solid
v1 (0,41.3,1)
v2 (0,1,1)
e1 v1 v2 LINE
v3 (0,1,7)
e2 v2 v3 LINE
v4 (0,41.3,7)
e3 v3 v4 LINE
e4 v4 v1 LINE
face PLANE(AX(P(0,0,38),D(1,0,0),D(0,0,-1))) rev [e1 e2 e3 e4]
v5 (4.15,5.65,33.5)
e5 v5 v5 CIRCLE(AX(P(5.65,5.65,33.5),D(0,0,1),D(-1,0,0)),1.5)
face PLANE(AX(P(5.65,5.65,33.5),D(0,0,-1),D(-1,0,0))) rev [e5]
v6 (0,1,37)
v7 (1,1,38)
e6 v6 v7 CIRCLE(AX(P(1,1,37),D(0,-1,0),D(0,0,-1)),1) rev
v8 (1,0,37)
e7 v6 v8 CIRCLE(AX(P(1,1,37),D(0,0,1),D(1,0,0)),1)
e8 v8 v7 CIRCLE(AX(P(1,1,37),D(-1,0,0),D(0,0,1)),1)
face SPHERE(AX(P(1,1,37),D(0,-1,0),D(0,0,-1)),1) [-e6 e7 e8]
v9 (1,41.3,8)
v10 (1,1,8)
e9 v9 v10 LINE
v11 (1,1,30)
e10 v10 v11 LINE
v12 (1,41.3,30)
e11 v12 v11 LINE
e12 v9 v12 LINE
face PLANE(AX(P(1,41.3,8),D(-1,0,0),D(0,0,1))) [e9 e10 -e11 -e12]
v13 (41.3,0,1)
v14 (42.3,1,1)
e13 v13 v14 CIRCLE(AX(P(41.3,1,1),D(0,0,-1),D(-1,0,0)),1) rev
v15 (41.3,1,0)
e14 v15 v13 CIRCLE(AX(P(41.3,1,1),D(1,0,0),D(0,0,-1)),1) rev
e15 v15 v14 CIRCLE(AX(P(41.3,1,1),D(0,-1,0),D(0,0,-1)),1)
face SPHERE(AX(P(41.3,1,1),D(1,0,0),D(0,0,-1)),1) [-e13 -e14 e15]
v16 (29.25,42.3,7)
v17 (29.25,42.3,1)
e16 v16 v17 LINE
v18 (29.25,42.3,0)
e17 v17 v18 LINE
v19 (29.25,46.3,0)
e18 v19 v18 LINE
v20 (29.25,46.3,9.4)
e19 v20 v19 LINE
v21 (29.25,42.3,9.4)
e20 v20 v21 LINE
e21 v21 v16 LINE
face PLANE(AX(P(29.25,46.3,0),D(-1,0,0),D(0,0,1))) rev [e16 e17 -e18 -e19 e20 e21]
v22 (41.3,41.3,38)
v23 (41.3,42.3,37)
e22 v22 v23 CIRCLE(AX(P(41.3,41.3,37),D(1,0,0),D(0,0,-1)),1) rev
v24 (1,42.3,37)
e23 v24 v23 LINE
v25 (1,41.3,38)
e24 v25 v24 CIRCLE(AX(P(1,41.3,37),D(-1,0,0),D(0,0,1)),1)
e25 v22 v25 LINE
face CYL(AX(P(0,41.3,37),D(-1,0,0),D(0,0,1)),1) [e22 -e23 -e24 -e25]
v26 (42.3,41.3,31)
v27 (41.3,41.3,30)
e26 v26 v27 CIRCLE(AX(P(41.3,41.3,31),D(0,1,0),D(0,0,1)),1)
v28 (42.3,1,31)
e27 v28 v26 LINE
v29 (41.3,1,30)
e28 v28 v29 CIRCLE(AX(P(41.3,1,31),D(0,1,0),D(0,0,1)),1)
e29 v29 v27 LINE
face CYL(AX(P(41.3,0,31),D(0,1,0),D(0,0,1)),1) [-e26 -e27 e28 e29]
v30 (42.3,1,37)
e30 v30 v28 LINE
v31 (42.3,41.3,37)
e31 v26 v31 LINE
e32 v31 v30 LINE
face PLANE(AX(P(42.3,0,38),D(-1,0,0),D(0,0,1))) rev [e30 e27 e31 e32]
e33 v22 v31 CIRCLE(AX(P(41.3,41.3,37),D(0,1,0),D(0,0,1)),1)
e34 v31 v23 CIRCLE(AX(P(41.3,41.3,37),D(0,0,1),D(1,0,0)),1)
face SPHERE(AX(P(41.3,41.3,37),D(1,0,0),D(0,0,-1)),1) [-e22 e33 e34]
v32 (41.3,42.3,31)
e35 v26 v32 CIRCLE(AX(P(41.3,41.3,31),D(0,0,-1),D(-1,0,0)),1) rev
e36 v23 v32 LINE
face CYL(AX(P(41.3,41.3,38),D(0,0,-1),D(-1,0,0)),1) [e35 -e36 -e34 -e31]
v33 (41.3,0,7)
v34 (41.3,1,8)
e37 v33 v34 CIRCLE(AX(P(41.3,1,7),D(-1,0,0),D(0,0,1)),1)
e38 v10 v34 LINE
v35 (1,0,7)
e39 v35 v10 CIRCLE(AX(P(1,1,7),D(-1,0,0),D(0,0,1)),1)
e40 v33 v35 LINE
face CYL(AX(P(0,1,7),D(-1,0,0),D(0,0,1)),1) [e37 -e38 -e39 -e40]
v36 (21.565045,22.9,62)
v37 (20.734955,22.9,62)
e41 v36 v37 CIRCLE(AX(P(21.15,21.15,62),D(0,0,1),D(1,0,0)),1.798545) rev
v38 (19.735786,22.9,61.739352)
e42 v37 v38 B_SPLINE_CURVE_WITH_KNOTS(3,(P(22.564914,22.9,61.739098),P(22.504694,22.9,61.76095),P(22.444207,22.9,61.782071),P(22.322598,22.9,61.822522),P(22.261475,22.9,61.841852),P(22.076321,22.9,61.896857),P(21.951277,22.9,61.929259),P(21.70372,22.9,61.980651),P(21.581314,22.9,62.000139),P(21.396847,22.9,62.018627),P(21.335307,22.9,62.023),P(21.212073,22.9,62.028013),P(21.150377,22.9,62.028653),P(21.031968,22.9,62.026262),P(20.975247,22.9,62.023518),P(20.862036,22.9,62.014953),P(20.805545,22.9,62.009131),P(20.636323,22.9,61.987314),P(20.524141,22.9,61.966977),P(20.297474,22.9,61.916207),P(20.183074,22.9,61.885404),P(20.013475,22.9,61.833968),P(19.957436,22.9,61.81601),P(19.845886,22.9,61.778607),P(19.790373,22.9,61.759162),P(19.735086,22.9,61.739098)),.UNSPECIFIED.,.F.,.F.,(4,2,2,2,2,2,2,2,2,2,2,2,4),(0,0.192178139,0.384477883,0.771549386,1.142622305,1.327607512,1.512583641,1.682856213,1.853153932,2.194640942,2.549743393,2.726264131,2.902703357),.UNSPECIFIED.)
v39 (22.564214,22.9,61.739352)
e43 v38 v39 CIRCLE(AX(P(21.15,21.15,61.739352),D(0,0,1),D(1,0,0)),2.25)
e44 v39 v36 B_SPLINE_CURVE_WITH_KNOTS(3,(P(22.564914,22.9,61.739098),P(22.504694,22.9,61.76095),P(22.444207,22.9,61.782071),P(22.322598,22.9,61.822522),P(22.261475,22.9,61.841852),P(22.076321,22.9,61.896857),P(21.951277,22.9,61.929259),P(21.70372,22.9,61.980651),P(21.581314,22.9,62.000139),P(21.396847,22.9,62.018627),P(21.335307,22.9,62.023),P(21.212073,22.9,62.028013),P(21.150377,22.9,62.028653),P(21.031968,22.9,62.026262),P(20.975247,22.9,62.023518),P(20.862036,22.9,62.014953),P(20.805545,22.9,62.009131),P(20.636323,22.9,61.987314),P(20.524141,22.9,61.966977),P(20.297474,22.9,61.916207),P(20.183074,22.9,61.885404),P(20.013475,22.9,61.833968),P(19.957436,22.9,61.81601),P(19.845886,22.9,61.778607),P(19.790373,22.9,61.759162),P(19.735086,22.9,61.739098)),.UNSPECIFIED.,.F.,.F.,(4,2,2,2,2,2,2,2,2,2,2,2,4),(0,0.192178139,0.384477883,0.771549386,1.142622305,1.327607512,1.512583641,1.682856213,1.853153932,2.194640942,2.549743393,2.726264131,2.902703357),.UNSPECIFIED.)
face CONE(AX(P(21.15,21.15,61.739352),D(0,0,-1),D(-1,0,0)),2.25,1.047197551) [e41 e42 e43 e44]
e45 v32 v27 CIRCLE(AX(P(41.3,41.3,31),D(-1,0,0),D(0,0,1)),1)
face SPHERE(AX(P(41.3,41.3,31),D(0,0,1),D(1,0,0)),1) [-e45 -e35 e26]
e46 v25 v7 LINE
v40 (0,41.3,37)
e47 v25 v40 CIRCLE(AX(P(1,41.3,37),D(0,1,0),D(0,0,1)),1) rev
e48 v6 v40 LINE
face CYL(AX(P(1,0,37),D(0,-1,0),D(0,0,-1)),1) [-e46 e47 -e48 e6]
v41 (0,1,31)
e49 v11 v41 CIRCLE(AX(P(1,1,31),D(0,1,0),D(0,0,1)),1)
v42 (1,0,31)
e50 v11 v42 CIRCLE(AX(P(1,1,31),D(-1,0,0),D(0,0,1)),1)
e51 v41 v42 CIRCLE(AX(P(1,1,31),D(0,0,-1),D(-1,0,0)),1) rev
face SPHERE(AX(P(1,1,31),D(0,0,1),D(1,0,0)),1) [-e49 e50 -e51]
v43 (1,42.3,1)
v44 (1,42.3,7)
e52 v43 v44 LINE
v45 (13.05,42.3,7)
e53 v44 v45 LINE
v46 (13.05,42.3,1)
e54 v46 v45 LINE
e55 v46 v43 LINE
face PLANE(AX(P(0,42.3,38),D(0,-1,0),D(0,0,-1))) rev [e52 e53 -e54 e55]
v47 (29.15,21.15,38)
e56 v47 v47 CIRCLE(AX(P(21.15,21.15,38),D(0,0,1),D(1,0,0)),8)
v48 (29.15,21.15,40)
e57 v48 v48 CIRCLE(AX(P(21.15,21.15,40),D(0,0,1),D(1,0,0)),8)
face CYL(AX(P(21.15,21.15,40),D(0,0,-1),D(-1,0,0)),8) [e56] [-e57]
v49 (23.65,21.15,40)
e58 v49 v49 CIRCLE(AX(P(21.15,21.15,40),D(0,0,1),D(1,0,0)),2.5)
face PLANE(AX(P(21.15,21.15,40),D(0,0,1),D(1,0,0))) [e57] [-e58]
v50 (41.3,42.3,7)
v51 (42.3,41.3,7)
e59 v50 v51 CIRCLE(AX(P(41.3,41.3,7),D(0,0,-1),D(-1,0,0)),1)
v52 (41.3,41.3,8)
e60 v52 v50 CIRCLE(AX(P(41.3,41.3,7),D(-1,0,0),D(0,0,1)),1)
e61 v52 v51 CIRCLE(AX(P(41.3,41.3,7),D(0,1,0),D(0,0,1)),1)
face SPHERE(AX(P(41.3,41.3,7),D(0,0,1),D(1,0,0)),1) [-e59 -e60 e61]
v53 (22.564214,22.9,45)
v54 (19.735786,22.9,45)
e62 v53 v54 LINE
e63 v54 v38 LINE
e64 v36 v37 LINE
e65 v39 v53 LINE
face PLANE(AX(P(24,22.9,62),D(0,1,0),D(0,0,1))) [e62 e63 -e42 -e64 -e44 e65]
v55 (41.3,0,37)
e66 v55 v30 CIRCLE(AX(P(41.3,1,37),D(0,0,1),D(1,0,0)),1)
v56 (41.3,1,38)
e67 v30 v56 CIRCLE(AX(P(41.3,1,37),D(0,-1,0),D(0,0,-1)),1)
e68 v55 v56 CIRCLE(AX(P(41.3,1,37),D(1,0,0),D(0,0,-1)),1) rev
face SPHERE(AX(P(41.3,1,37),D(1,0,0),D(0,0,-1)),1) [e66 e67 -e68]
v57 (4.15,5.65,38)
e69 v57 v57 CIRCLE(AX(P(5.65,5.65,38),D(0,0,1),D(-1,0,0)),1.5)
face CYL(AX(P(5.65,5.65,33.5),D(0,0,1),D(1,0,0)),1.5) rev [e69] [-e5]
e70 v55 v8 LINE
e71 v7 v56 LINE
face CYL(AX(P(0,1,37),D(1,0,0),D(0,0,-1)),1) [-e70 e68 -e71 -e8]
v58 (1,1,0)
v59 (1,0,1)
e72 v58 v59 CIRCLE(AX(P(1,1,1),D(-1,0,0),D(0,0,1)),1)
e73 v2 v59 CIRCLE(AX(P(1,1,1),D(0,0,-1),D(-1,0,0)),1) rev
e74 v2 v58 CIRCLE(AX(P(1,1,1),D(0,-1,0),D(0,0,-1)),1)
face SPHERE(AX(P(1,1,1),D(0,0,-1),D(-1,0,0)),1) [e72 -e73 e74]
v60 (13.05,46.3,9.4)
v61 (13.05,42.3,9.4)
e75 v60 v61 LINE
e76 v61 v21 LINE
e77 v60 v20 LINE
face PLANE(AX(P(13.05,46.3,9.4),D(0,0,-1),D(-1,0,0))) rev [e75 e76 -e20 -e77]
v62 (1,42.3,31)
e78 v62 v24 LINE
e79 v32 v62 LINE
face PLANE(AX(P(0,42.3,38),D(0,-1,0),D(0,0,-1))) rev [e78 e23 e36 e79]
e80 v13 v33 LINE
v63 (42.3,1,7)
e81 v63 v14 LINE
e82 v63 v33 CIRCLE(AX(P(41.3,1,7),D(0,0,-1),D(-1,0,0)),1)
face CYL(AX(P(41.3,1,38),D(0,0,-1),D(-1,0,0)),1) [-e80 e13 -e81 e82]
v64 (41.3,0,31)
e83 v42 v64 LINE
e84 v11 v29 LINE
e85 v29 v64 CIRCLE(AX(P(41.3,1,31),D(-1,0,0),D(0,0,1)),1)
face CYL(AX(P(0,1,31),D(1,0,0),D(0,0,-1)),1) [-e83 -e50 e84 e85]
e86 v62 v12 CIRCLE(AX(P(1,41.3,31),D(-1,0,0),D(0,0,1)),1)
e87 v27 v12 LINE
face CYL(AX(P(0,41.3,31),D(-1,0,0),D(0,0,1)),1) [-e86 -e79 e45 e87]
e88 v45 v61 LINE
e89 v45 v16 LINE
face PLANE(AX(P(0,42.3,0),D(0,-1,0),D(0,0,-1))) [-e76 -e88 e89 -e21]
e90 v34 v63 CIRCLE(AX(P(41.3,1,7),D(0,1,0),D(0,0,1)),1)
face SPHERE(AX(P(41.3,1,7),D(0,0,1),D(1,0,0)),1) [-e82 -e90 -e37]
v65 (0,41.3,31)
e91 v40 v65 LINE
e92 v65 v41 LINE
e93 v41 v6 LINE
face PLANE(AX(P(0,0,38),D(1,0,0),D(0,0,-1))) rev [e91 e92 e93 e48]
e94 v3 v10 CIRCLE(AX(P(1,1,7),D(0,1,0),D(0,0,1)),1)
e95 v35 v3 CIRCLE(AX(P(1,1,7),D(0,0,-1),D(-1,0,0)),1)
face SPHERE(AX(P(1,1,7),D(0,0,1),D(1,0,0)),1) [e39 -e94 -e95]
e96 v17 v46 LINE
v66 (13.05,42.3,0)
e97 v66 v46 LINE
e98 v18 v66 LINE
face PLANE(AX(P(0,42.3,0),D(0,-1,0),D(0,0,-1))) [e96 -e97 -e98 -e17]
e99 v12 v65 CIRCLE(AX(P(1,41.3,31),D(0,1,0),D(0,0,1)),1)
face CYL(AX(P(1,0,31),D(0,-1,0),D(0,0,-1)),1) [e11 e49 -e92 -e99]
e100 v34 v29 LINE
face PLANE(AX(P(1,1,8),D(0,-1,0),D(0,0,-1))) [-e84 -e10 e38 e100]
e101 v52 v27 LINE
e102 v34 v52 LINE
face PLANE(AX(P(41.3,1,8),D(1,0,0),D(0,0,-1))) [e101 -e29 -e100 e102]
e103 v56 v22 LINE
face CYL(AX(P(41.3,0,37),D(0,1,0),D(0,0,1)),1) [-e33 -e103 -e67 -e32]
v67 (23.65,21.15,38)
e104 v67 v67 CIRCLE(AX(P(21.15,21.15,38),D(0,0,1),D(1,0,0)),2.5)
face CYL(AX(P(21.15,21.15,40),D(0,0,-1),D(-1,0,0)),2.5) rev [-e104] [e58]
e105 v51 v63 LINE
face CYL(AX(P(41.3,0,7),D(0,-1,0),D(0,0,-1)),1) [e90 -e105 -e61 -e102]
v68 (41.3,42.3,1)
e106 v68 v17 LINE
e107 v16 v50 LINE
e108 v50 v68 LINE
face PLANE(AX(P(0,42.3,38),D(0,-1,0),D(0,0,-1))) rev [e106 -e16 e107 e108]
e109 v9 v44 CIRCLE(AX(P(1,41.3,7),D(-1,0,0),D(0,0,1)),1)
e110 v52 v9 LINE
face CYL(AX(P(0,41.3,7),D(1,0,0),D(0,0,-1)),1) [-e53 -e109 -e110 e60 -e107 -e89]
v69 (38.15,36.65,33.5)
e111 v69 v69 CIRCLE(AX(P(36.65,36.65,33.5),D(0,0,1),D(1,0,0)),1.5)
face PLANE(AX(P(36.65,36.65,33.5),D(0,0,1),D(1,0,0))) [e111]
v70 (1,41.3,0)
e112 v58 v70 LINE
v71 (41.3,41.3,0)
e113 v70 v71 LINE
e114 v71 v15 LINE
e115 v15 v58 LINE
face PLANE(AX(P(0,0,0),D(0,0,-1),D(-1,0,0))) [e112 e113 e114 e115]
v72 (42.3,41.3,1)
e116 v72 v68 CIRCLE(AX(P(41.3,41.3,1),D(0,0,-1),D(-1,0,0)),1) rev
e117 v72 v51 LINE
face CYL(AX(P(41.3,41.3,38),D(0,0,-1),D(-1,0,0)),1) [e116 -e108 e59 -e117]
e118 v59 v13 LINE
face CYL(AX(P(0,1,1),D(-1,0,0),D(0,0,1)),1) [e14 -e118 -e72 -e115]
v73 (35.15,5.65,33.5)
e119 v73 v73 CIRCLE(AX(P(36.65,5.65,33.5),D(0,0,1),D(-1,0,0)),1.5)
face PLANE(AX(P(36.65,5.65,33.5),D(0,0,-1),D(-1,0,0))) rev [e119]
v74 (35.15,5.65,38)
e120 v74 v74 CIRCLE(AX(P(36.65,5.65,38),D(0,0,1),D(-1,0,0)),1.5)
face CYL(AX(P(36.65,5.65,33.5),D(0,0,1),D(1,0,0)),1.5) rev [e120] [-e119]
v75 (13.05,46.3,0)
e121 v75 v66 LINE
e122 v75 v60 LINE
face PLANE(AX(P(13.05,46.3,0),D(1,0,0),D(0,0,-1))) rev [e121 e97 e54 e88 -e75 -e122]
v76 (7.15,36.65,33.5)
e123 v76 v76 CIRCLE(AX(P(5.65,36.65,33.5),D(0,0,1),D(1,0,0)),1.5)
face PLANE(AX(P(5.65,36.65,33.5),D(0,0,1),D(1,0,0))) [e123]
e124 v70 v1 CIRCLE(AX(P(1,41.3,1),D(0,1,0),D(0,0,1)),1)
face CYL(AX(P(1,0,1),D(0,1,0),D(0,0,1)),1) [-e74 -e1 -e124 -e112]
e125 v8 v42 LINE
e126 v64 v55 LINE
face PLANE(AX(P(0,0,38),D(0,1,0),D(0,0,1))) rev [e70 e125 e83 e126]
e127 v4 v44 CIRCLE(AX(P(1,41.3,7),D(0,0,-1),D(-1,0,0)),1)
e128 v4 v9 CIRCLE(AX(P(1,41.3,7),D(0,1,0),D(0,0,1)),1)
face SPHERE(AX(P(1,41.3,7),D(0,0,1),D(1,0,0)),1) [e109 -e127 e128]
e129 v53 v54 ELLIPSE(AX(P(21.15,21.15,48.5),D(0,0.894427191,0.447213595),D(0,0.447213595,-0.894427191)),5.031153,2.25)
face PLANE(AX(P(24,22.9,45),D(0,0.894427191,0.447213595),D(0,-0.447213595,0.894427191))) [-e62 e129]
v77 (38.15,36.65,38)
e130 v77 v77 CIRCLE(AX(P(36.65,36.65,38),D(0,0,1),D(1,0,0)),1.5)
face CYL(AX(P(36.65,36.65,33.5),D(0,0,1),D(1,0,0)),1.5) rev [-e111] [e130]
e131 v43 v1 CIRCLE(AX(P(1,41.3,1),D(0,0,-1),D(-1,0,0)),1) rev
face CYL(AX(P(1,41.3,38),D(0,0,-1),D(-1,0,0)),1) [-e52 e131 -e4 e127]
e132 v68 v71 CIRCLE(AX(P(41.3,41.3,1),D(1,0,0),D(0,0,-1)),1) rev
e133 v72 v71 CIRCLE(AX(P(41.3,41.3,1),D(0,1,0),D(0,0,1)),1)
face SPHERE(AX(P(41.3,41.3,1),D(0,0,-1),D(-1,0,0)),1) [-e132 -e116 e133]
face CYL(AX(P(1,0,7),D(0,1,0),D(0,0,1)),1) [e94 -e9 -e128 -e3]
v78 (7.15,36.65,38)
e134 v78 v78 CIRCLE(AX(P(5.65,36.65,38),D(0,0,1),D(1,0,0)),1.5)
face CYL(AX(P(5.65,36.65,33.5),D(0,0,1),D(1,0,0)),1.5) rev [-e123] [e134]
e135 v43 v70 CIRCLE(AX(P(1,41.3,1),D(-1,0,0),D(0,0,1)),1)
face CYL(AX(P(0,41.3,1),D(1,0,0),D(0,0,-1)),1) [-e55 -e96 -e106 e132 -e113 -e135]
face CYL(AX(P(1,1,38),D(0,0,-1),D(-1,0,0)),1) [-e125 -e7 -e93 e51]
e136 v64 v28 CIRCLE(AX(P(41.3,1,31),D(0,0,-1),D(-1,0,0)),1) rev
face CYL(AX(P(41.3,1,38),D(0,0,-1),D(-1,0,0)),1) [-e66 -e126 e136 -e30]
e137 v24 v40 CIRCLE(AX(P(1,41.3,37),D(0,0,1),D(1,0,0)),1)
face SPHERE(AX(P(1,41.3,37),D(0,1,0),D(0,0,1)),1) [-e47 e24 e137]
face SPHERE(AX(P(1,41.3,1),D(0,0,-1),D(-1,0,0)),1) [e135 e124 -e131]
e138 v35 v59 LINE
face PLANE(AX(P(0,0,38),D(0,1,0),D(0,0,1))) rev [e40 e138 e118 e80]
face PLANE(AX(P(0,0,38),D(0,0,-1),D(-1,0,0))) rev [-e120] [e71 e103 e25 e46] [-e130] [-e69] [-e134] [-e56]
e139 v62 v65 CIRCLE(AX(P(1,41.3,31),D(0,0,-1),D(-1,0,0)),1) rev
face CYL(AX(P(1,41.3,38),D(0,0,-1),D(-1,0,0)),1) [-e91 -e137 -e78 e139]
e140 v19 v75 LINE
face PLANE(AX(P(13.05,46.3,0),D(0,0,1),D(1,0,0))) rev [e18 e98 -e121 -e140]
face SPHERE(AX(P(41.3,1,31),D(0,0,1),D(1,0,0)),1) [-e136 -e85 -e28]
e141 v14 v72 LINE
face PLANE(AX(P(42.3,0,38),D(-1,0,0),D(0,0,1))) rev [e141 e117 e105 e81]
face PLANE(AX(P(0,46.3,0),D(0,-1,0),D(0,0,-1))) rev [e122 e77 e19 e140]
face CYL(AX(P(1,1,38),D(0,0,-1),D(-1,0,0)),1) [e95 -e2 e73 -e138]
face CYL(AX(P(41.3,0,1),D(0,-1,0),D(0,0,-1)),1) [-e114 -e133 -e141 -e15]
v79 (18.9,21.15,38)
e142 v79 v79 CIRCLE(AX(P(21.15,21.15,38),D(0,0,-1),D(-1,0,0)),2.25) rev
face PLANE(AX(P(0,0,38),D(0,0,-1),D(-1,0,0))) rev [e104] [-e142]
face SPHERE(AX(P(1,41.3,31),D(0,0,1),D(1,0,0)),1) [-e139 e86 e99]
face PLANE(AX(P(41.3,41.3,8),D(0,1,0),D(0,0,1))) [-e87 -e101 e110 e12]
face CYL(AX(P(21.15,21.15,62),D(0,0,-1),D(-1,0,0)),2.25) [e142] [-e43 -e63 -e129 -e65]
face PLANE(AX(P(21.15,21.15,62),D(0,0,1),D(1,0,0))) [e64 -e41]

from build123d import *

# Parameters (mm, degrees)
SKETCH_1_W          = 42.3
SKETCH_1_H          = 42.3
EXTRUDE_1_DEPTH     = 38
SKETCH_3_R          = 1.5
CUT_EXTRUDE_1_DEPTH = 4.5
SKETCH_4_R          = 8
SKETCH_4_R_2        = 2.5
EXTRUDE_2_DEPTH     = 2
SKETCH_5_R          = 2.25
EXTRUDE_3_DEPTH     = 24
CUT_EXTRUDE_2_DEPTH = 24
FILLET_1_R          = 1
CUT_EXTRUDE_START   = -8
SKETCH_10_W         = 42.3
SKETCH_10_H         = 42.3
SKETCH_10_W_2       = 40.3
SKETCH_10_H_2       = 40.3
CUT_EXTRUDE_4_DEPTH = 22
FILLET_2_R          = 1
SKETCH_11_W         = 16.2
SKETCH_11_H         = 9.4
EXTRUDE_4_DEPTH     = 4


with BuildPart() as part:
    # 草图1 → 凸台-拉伸1 (new body)
    with BuildSketch(Plane.XY):
        with Locations((21.15, 21.15)):
            Rectangle(SKETCH_1_W, SKETCH_1_H)
    extrude(amount=EXTRUDE_1_DEPTH)

    # 草图3 → 切除-拉伸1 (cut)
    with BuildSketch(Plane.XY.offset(38)):
        with Locations((5.65, 36.65)):
            Circle(SKETCH_3_R)
        with Locations((36.65, 36.65)):
            Circle(SKETCH_3_R)
        with Locations(Location((36.65, 5.65, 0), (0, 0, 180))):
            Circle(SKETCH_3_R)
        with Locations(Location((5.65, 5.65, 0), (0, 0, 180))):
            Circle(SKETCH_3_R)
    extrude(amount=-CUT_EXTRUDE_1_DEPTH, mode=Mode.SUBTRACT)

    # 草图4 → 凸台-拉伸2 (add)
    with BuildSketch(Plane.XY.offset(38)):
        with Locations((21.15, 21.15)):
            Circle(SKETCH_4_R)
        with Locations((21.15, 21.15)):
            Circle(SKETCH_4_R_2, mode=Mode.SUBTRACT)
    extrude(amount=EXTRUDE_2_DEPTH)

    # 草图5 → 凸台-拉伸3 (add)
    with BuildSketch(Plane.XY.offset(38)):
        with Locations(Location((21.15, 21.15, 0), (0, 0, 180))):
            Circle(SKETCH_5_R)
    extrude(amount=EXTRUDE_3_DEPTH)

    # 草图6 → 切除-拉伸2 (cut)
    with BuildSketch(Plane(origin=(0, 0, 0), x_dir=(0, 0, -1), z_dir=(1, 0, 0))):
        Polygon((-62, 22.9), (-45, 22.9), (-44, 23.4), (-62, 23.4), align=None)
    extrude(amount=CUT_EXTRUDE_2_DEPTH, mode=Mode.SUBTRACT)

    # 草图9 → 切除-旋转1 (revolve, cut)
    with BuildSketch(Plane(origin=(0, 21.15, 0), x_dir=(1, 0, 0), z_dir=(0, 1, 0)), mode=Mode.PRIVATE) as cut_revolve_1_sk:
        Polygon((23.4, -61.739352103), (22.6, -62.201232319), (23.4, -62.201232319), align=None)
    revolve(cut_revolve_1_sk.sketch.rotate(Axis((21.15, 21.15, 62), (0, 0, -1)), 180), axis=Axis((21.15, 21.15, 62), (0, 0, -1)), mode=Mode.SUBTRACT)

    # 圆角1
    fillet_1_edges = [part.edges().sort_by_distance(p)[0] for p in [
        (42.3, 21.15, 38),
        (21.15, 42.3, 38),
        (0, 21.15, 38),
        (21.15, 42.3, 0),
        (42.3, 21.15, 0),
        (21.15, 0, 0),
        (0, 21.15, 0),
        (0, 42.3, 19),
        (42.3, 42.3, 19),
        (42.3, 0, 19),
        (0, 0, 19),
        (21.15, 0, 38),
    ]]
    fillet(fillet_1_edges, radius=FILLET_1_R)

    # 草图10 → 切除-拉伸4 (cut)
    with BuildSketch(Plane.XY.offset(38).offset(CUT_EXTRUDE_START)):
        with Locations((21.15, 21.15)):
            Rectangle(SKETCH_10_W, SKETCH_10_H)
        with Locations((21.15, 21.15)):
            Rectangle(SKETCH_10_W_2, SKETCH_10_H_2, mode=Mode.SUBTRACT)
    extrude(amount=-CUT_EXTRUDE_4_DEPTH, mode=Mode.SUBTRACT)

    # 圆角2
    fillet_2_edges = [part.edges().sort_by_distance(p)[0] for p in [
        (0.292893219, 0.292893219, 30),
        (0.292893219, 0.292893219, 8),
        (42.3, 21.15, 8),
        (21.15, 42.3, 8),
        (0, 21.15, 8),
        (21.15, 0, 8),
        (42.007106781, 42.007106781, 30),
        (42.007106781, 0.292893219, 30),
        (0.292893219, 42.007106781, 30),
        (42.007106781, 42.007106781, 8),
        (42.007106781, 0.292893219, 8),
        (0.292893219, 42.007106781, 8),
        (21.15, 42.3, 30),
        (0, 21.15, 30),
        (21.15, 0, 30),
        (42.3, 21.15, 30),
    ]]
    fillet(fillet_2_edges, radius=FILLET_2_R - 0.0001)  # a hair under: the kernel refuses the full size

    # 草图11 → 凸台-拉伸4 (add)
    with BuildSketch(Plane(origin=(0, 42.3, 0), x_dir=(1, 0, 0), z_dir=(0, 1, 0))):
        with Locations((21.15, -4.7)):
            Rectangle(SKETCH_11_W, SKETCH_11_H)
    extrude(amount=EXTRUDE_4_DEPTH)


solid = part.part
